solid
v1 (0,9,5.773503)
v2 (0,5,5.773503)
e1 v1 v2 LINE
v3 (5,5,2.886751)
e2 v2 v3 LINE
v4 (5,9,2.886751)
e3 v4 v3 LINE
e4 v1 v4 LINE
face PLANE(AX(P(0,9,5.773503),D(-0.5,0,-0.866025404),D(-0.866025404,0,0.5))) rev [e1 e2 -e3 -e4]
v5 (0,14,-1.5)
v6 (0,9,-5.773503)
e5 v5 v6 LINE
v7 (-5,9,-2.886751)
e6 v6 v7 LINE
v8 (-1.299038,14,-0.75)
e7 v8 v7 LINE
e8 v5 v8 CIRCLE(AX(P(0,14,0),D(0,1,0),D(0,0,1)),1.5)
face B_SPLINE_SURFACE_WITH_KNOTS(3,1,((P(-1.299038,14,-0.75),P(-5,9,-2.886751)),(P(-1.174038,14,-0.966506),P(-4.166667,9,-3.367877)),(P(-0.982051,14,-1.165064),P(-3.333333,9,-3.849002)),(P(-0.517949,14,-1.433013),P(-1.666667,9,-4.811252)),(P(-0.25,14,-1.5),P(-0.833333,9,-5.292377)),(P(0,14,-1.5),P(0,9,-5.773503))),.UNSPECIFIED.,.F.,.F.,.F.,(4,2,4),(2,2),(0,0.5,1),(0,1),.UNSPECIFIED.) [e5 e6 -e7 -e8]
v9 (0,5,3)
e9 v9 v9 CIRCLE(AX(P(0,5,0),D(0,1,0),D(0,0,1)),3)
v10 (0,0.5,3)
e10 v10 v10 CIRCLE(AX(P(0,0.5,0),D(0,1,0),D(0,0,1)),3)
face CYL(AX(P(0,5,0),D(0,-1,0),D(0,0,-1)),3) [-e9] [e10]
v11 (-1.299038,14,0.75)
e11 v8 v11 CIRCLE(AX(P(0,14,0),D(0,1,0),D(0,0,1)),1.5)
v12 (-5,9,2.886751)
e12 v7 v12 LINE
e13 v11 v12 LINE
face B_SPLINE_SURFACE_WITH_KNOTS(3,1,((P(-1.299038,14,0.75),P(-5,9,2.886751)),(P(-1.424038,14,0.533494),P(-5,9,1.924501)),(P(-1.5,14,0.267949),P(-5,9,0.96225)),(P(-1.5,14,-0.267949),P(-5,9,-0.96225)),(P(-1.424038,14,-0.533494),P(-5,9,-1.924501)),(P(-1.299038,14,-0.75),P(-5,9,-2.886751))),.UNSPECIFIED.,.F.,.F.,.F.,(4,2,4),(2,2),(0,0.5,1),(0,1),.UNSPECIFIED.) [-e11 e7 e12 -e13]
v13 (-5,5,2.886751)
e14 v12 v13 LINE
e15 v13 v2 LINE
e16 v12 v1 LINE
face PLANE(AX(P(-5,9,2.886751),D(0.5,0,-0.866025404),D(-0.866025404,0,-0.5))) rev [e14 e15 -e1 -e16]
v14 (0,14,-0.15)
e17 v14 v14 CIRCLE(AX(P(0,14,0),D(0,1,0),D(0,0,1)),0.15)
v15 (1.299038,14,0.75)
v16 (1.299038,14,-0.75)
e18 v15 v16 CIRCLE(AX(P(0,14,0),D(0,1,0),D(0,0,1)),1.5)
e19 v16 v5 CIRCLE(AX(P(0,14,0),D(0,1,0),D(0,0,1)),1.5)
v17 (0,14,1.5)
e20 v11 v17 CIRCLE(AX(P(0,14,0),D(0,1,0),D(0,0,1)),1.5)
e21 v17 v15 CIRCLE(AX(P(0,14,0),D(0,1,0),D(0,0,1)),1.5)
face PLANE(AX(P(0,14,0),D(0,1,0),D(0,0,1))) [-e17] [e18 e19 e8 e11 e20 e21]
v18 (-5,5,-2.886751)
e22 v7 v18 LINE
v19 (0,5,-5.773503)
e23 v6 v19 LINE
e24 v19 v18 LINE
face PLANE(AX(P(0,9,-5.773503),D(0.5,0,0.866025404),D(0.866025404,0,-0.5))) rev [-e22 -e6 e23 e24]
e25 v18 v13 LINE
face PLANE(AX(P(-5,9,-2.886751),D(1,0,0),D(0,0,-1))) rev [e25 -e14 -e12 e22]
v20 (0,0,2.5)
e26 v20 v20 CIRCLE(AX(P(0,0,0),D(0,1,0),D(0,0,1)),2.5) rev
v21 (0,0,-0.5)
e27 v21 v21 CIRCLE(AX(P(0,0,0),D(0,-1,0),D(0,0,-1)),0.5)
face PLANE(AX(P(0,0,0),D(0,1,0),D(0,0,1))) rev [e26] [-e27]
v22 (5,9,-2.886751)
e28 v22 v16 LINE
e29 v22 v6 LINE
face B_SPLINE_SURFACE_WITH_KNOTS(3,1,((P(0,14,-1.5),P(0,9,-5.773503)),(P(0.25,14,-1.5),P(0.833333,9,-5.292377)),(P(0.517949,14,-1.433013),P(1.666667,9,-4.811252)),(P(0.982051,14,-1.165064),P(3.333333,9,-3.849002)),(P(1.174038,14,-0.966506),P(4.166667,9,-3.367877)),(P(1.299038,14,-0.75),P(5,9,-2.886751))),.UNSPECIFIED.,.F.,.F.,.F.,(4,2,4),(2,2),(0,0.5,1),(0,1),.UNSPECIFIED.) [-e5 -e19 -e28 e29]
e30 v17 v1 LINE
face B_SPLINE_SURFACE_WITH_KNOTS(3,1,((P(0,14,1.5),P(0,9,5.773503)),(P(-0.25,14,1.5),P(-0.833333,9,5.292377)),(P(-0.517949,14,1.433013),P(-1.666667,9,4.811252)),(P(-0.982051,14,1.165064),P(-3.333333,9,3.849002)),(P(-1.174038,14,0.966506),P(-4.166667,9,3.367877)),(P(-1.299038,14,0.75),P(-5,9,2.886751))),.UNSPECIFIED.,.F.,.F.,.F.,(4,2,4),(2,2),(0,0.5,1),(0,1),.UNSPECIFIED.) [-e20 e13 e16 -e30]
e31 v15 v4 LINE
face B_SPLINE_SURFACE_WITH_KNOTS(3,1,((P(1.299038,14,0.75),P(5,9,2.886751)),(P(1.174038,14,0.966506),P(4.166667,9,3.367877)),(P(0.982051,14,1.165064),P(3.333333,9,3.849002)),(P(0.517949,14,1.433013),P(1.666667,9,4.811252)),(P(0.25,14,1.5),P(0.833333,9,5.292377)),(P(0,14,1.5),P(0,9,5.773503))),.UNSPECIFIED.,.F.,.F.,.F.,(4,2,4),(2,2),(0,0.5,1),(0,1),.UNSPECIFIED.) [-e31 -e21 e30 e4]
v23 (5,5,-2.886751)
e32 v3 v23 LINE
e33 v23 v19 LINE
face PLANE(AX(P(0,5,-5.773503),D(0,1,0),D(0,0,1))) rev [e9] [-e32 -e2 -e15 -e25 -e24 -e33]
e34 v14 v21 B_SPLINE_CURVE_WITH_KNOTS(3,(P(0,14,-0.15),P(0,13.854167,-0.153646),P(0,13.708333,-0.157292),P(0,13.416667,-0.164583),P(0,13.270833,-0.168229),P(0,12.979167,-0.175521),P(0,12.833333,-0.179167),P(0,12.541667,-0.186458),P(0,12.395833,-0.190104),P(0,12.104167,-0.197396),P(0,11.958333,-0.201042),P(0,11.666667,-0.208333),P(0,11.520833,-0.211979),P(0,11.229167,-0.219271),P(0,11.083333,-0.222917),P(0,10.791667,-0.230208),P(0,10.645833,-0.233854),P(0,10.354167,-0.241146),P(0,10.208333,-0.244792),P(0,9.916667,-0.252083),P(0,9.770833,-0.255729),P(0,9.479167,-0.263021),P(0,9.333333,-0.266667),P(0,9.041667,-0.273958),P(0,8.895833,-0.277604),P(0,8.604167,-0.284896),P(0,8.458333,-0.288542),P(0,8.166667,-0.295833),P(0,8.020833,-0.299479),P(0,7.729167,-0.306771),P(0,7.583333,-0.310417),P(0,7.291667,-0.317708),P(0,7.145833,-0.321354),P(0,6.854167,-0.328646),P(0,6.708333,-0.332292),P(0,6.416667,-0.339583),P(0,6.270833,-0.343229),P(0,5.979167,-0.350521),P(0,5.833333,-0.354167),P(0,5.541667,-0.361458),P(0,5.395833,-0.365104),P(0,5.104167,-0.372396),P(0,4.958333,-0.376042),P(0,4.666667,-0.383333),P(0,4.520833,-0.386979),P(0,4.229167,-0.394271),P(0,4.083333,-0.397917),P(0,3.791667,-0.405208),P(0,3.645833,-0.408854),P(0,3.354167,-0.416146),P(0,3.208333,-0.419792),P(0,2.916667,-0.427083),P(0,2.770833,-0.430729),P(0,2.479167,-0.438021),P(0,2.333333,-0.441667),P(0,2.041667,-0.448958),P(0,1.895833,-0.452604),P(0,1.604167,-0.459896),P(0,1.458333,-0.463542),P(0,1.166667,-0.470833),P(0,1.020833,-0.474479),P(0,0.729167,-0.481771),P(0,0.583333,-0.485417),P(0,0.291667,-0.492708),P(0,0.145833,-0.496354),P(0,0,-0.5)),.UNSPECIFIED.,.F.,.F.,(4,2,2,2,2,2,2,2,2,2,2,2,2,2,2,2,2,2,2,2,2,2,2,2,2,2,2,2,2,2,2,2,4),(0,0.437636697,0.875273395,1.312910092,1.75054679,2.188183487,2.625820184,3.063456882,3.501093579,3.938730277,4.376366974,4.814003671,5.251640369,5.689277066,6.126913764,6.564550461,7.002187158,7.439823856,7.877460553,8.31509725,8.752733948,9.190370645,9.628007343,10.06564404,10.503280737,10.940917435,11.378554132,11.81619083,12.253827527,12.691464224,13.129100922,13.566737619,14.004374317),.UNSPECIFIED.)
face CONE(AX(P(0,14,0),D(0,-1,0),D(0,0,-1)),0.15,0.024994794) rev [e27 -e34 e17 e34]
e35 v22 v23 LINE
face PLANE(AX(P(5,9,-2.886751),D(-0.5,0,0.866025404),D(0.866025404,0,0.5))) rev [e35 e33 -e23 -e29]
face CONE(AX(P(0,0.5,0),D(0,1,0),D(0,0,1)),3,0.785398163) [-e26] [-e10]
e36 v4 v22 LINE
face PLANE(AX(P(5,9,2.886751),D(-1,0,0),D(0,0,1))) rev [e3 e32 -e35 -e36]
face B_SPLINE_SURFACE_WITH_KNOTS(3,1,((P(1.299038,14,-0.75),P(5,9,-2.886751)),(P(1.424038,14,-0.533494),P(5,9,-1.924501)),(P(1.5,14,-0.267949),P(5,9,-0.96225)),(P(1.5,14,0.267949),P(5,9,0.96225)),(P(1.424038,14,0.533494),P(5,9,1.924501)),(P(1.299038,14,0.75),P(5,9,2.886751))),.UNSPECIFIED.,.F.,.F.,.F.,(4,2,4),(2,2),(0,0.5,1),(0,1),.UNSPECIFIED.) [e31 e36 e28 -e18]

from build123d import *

# Parameters (mm, degrees)
SKETCH1_R           = 3
BOSS_EXTRUDE1_DEPTH = 5
BOSS_EXTRUDE2_DEPTH = 4
CHAMFER1_SIZE       = 0.5
SKETCH5_R           = 0.15
SKETCH4_R           = 0.5


with BuildPart() as part:
    # Sketch1 → Boss-Extrude1 (new body)
    with BuildSketch(Plane(origin=(0, 0, 0), x_dir=(1, 0, 0), z_dir=(0, 1, 0))):
        with Locations(Location((0, 0, 0), (0, 0, 270))):
            Circle(SKETCH1_R)
    extrude(amount=BOSS_EXTRUDE1_DEPTH)

    # Sketch2 → Boss-Extrude2 (add)
    with BuildSketch(Plane(origin=(0, 5, 0), x_dir=(1, 0, 0), z_dir=(0, 1, 0))):
        Polygon((0, 5.773502692), (-5, 2.886751346), (-5, -2.886751346), (0, -5.773502692), (5, -2.886751346), (5, 2.886751346), align=None)
    extrude(amount=BOSS_EXTRUDE2_DEPTH)

    # Chamfer1
    chamfer1_edges = [part.edges().sort_by_distance(p)[0] for p in [
        (0, 0, -3),
    ]]
    chamfer(chamfer1_edges, length=CHAMFER1_SIZE)

    # Loft1: read off the stored shape, not the designer's step
    # Loft1: loft between two sections, ruled curve by curve
    loft1_from = [
        Edge.make_bspline([(1.299038106, 14, -0.75), (1.424038106, 14, -0.533493649), (1.5, 14, -0.267949192), (1.5, 14, 0.267949192), (1.424038106, 14, 0.533493649), (1.299038106, 14, 0.75)], [0, 0, 0, 0, 0.5, 0.5, 1, 1, 1, 1], 3),
        Edge.make_bspline([(1.299038106, 14, 0.75), (1.174038106, 14, 0.966506351), (0.982050808, 14, 1.165063509), (0.517949192, 14, 1.433012702), (0.25, 14, 1.5), (0, 14, 1.5)], [0, 0, 0, 0, 0.5, 0.5, 1, 1, 1, 1], 3),
        Edge.make_bspline([(0, 14, -1.5), (0.25, 14, -1.5), (0.517949192, 14, -1.433012702), (0.982050808, 14, -1.165063509), (1.174038106, 14, -0.966506351), (1.299038106, 14, -0.75)], [0, 0, 0, 0, 0.5, 0.5, 1, 1, 1, 1], 3),
        Edge.make_bspline([(0, 14, 1.5), (-0.25, 14, 1.5), (-0.517949192, 14, 1.433012702), (-0.982050808, 14, 1.165063509), (-1.174038106, 14, 0.966506351), (-1.299038106, 14, 0.75)], [0, 0, 0, 0, 0.5, 0.5, 1, 1, 1, 1], 3),
        Edge.make_bspline([(-1.299038106, 14, 0.75), (-1.424038106, 14, 0.533493649), (-1.5, 14, 0.267949192), (-1.5, 14, -0.267949192), (-1.424038106, 14, -0.533493649), (-1.299038106, 14, -0.75)], [0, 0, 0, 0, 0.5, 0.5, 1, 1, 1, 1], 3),
        Edge.make_bspline([(-1.299038106, 14, -0.75), (-1.174038106, 14, -0.966506351), (-0.982050808, 14, -1.165063509), (-0.517949192, 14, -1.433012702), (-0.25, 14, -1.5), (0, 14, -1.5)], [0, 0, 0, 0, 0.5, 0.5, 1, 1, 1, 1], 3),
    ]
    loft1_to = [
        Edge.make_bspline([(5, 9, -2.886751346), (5, 9, -1.924500897), (5, 9, -0.962250449), (5, 9, 0.962250449), (5, 9, 1.924500897), (5, 9, 2.886751346)], [0, 0, 0, 0, 0.5, 0.5, 1, 1, 1, 1], 3),
        Edge.make_bspline([(5, 9, 2.886751346), (4.166666667, 9, 3.36787657), (3.333333333, 9, 3.849001795), (1.666666667, 9, 4.811252243), (0.833333333, 9, 5.292377468), (0, 9, 5.773502692)], [0, 0, 0, 0, 0.5, 0.5, 1, 1, 1, 1], 3),
        Edge.make_bspline([(0, 9, -5.773502692), (0.833333333, 9, -5.292377468), (1.666666667, 9, -4.811252243), (3.333333333, 9, -3.849001795), (4.166666667, 9, -3.36787657), (5, 9, -2.886751346)], [0, 0, 0, 0, 0.5, 0.5, 1, 1, 1, 1], 3),
        Edge.make_bspline([(0, 9, 5.773502692), (-0.833333333, 9, 5.292377468), (-1.666666667, 9, 4.811252243), (-3.333333333, 9, 3.849001795), (-4.166666667, 9, 3.36787657), (-5, 9, 2.886751346)], [0, 0, 0, 0, 0.5, 0.5, 1, 1, 1, 1], 3),
        Edge.make_bspline([(-5, 9, 2.886751346), (-5, 9, 1.924500897), (-5, 9, 0.962250449), (-5, 9, -0.962250449), (-5, 9, -1.924500897), (-5, 9, -2.886751346)], [0, 0, 0, 0, 0.5, 0.5, 1, 1, 1, 1], 3),
        Edge.make_bspline([(-5, 9, -2.886751346), (-4.166666667, 9, -3.36787657), (-3.333333333, 9, -3.849001795), (-1.666666667, 9, -4.811252243), (-0.833333333, 9, -5.292377468), (0, 9, -5.773502692)], [0, 0, 0, 0, 0.5, 0.5, 1, 1, 1, 1], 3),
    ]
    loft1 = Solid(Shell([*[Face.make_surface_from_curves(loft1_from[k], loft1_to[k]) for k in range(6)], Face(Wire(loft1_from)), Face(Wire(loft1_to))]))
    add(loft1)

    # Sketch5 → Cut-Loft1 section 0
    with BuildSketch(Plane(origin=(0, 14, 0), x_dir=(-1, 0, 0), z_dir=(0, 1, 0))):
        Circle(SKETCH5_R)
    # Sketch4 → Cut-Loft1 section 1
    with BuildSketch(Plane.XZ):
        Circle(SKETCH4_R)
    loft(mode=Mode.SUBTRACT)


solid = part.part
